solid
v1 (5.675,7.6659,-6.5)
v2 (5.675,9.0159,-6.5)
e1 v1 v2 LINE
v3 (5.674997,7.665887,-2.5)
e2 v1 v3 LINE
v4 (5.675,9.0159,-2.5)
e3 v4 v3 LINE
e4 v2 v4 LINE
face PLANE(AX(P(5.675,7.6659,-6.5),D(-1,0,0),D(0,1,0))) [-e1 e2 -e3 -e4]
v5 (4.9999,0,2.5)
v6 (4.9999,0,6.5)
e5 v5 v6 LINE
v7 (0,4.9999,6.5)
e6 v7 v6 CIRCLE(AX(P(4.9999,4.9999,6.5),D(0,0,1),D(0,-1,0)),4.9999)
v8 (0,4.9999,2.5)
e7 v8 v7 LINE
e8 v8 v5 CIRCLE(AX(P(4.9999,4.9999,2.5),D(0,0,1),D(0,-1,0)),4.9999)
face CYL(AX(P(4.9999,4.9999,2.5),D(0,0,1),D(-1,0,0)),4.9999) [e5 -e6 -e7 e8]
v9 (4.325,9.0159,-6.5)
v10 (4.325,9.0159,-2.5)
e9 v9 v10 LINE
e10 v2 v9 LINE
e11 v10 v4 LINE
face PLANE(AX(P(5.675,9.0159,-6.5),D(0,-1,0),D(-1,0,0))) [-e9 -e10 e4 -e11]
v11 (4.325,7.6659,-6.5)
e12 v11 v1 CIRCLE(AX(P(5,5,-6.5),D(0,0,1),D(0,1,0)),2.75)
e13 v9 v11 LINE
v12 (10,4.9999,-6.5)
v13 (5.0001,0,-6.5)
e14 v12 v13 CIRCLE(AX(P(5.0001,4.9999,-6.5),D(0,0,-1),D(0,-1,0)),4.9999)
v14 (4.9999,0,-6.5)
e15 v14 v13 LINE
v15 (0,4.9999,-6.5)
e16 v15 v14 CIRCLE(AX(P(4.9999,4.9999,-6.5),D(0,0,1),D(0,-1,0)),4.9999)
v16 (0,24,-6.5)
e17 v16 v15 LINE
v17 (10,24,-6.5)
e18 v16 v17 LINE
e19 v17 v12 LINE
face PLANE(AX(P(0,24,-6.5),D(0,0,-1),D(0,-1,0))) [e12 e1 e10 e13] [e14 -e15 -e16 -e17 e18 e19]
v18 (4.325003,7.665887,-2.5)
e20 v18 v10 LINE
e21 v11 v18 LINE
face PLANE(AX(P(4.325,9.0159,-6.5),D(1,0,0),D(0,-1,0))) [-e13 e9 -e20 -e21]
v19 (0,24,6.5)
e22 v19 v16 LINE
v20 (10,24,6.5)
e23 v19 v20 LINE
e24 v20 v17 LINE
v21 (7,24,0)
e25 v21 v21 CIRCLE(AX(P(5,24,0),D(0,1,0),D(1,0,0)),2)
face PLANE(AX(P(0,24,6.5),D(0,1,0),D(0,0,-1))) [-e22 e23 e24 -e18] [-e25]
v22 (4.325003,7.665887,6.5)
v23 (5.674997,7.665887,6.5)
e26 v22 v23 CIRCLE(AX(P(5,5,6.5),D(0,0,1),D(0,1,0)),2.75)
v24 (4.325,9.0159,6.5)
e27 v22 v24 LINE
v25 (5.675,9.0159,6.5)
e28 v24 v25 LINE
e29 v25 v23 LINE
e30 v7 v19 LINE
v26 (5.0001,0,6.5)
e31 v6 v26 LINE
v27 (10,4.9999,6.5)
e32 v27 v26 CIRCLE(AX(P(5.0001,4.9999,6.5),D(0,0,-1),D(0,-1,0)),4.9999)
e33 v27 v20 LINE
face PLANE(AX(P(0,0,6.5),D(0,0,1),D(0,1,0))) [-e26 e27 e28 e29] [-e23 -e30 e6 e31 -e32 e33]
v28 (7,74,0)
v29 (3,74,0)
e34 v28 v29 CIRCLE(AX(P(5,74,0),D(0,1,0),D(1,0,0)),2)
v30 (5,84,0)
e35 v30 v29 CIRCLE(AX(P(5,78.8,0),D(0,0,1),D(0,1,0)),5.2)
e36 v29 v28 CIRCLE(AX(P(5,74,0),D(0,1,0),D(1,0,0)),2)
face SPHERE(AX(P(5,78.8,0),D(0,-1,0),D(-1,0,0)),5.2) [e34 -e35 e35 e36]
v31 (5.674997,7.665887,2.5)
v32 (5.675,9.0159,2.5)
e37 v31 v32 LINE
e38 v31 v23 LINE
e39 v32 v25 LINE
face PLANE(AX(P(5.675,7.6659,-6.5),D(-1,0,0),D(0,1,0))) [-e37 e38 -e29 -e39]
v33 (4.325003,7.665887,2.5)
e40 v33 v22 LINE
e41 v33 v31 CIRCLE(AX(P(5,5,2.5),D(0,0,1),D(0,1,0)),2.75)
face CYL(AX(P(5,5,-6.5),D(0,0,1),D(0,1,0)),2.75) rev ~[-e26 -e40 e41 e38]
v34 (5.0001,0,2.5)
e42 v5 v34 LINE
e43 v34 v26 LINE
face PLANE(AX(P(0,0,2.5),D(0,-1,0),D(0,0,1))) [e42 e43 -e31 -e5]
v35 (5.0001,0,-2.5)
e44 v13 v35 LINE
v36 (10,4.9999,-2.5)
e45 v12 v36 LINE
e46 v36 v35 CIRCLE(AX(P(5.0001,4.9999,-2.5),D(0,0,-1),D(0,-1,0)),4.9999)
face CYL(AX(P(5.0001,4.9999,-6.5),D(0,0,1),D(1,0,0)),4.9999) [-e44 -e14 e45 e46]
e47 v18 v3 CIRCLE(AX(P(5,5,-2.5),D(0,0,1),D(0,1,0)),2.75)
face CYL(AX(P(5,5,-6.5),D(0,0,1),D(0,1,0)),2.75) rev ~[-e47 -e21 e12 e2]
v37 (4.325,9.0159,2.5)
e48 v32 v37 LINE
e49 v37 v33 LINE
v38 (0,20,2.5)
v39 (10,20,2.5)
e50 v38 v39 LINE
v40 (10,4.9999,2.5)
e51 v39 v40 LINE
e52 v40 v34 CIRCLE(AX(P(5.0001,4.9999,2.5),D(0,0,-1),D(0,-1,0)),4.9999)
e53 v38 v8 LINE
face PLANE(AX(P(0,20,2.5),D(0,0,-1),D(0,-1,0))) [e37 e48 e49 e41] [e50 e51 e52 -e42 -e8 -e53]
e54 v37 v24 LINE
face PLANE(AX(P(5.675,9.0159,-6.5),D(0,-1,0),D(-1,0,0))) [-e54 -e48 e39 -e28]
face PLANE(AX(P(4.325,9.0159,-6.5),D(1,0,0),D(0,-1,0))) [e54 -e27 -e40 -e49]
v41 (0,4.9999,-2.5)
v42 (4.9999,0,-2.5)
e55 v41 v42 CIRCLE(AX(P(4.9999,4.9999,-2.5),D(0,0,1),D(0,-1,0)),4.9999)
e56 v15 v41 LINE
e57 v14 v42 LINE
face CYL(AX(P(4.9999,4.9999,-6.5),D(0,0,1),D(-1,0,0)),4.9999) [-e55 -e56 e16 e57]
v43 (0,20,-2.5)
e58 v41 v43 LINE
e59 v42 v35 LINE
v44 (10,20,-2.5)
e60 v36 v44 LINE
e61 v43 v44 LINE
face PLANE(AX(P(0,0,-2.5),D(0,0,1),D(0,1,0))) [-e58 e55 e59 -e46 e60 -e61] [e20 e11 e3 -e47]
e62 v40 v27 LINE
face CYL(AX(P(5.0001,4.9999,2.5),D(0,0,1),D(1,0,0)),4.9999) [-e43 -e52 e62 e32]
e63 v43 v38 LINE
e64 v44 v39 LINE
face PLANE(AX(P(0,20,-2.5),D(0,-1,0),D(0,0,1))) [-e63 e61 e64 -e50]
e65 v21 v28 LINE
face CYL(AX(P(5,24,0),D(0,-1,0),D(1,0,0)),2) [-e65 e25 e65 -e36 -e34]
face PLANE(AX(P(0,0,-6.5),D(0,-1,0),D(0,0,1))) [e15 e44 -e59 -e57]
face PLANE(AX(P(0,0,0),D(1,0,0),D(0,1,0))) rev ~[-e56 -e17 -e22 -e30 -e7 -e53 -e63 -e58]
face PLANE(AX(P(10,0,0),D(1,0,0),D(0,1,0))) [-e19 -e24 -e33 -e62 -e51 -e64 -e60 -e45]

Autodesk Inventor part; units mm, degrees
ref_plane "YZ Plane" through (0, 0, 0) normal (1, 0, 0) x (0, 1, 0)
ref_plane "XZ Plane" through (0, 0, 0) normal (0, 1, 0) x (-1, 0, 0)
ref_plane "XY Plane" through (0, 0, 0) normal (0, 0, 1) x (1, 0, 0)
sketch "Sketch1" plane through (0, 0, 0) normal (1, 0, 0) x (0, 1, 0)
  line L0 (0, 6.5) -> (24, 6.5)
  line L1 (24, 6.5) -> (24, -6.5)
  line L2 (24, -6.5) -> (0, -6.5)
  line L3 (0, -6.5) -> (0, -2.5)
  line L4 (0, -2.5) -> (20, -2.5)
  line L5 (20, -2.5) -> (20, 2.5)
  line L6 (20, 2.5) -> (0, 2.5)
  line L7 (0, 2.5) -> (0, 6.5)
  point P0 (0, 0)
  dimension "d0" = 4
  dimension "d1" = 20
  dimension "d2" = 4
  dimension "d3" = 5
  dimension "d11" = 2.5
  dimension "d12" = 0
extrude "Extrusion1" add sketch "Sketch1" along normal blind 10
sketch "Sketch2" plane through (0, 24, 6.5) normal (0, 1, 0) x (1, 0, 0)
  circle A0 centre (5, 6.5) radius 2
  line L0 (0, 0) -> (0, 13) projected
  line L1 (0, 13) -> (10, 13) projected
  point P0 (0, 6.5)
  dimension "d6" = 4
  dimension "d7" = 5
  dimension "d8" = 6.5
extrude "Extrusion2" add sketch "Sketch2" along normal blind 50
sketch "Sketch3" plane through (0, 0, 0) normal (0, 0, 1) x (1, 0, 0)
  line L0 (7, 74) -> (3, 74) projected
  line L1 (3, 74) -> (5, 74)
  line L2 (5, 74) -> (5, 84)
  arc A0 (5, 84) -> (3, 74) centre (5, 78.8) ccw
  point P0 (0, 0)
  dimension "d13" = 10
revolve "Revolution1" add sketch "Sketch3" angle 360 about axis through (5, 74, 0) along (0, 1, 0)
fillet "Fillet1" radius 5 4 edges at (0, 0, -4.5) (10, 0, -4.5) (10, 0, 4.5) (0, 0, 4.5)
hole "Hole1" at (5, 5, -6.5) direction (0, 0, 1) diameter 5.5 end through all
sketch "Sketch4" plane through (10, 24, -6.5) normal (0, 0, -1) x (-1, 0, 0)
  circle A0 centre (5, -19) radius 2.75 projected
  line L0 (4.325, -16.3341) -> (4.325, -14.9841)
  line L1 (4.325, -14.9841) -> (5.675, -14.9841)
  line L2 (5.675, -14.9841) -> (5.675, -16.3341)
  line L3 (4.325, -16.3341) -> (5.675, -16.3341)
  point P0 (10, -24)
  dimension "d25" = 1.35
  dimension "d26" = 0.675
  dimension "d27" = 1.35
extrude "Extrusion3" cut sketch "Sketch4" against normal through all contours A0 L0 L1 L2
properties part number "EndJoint"
